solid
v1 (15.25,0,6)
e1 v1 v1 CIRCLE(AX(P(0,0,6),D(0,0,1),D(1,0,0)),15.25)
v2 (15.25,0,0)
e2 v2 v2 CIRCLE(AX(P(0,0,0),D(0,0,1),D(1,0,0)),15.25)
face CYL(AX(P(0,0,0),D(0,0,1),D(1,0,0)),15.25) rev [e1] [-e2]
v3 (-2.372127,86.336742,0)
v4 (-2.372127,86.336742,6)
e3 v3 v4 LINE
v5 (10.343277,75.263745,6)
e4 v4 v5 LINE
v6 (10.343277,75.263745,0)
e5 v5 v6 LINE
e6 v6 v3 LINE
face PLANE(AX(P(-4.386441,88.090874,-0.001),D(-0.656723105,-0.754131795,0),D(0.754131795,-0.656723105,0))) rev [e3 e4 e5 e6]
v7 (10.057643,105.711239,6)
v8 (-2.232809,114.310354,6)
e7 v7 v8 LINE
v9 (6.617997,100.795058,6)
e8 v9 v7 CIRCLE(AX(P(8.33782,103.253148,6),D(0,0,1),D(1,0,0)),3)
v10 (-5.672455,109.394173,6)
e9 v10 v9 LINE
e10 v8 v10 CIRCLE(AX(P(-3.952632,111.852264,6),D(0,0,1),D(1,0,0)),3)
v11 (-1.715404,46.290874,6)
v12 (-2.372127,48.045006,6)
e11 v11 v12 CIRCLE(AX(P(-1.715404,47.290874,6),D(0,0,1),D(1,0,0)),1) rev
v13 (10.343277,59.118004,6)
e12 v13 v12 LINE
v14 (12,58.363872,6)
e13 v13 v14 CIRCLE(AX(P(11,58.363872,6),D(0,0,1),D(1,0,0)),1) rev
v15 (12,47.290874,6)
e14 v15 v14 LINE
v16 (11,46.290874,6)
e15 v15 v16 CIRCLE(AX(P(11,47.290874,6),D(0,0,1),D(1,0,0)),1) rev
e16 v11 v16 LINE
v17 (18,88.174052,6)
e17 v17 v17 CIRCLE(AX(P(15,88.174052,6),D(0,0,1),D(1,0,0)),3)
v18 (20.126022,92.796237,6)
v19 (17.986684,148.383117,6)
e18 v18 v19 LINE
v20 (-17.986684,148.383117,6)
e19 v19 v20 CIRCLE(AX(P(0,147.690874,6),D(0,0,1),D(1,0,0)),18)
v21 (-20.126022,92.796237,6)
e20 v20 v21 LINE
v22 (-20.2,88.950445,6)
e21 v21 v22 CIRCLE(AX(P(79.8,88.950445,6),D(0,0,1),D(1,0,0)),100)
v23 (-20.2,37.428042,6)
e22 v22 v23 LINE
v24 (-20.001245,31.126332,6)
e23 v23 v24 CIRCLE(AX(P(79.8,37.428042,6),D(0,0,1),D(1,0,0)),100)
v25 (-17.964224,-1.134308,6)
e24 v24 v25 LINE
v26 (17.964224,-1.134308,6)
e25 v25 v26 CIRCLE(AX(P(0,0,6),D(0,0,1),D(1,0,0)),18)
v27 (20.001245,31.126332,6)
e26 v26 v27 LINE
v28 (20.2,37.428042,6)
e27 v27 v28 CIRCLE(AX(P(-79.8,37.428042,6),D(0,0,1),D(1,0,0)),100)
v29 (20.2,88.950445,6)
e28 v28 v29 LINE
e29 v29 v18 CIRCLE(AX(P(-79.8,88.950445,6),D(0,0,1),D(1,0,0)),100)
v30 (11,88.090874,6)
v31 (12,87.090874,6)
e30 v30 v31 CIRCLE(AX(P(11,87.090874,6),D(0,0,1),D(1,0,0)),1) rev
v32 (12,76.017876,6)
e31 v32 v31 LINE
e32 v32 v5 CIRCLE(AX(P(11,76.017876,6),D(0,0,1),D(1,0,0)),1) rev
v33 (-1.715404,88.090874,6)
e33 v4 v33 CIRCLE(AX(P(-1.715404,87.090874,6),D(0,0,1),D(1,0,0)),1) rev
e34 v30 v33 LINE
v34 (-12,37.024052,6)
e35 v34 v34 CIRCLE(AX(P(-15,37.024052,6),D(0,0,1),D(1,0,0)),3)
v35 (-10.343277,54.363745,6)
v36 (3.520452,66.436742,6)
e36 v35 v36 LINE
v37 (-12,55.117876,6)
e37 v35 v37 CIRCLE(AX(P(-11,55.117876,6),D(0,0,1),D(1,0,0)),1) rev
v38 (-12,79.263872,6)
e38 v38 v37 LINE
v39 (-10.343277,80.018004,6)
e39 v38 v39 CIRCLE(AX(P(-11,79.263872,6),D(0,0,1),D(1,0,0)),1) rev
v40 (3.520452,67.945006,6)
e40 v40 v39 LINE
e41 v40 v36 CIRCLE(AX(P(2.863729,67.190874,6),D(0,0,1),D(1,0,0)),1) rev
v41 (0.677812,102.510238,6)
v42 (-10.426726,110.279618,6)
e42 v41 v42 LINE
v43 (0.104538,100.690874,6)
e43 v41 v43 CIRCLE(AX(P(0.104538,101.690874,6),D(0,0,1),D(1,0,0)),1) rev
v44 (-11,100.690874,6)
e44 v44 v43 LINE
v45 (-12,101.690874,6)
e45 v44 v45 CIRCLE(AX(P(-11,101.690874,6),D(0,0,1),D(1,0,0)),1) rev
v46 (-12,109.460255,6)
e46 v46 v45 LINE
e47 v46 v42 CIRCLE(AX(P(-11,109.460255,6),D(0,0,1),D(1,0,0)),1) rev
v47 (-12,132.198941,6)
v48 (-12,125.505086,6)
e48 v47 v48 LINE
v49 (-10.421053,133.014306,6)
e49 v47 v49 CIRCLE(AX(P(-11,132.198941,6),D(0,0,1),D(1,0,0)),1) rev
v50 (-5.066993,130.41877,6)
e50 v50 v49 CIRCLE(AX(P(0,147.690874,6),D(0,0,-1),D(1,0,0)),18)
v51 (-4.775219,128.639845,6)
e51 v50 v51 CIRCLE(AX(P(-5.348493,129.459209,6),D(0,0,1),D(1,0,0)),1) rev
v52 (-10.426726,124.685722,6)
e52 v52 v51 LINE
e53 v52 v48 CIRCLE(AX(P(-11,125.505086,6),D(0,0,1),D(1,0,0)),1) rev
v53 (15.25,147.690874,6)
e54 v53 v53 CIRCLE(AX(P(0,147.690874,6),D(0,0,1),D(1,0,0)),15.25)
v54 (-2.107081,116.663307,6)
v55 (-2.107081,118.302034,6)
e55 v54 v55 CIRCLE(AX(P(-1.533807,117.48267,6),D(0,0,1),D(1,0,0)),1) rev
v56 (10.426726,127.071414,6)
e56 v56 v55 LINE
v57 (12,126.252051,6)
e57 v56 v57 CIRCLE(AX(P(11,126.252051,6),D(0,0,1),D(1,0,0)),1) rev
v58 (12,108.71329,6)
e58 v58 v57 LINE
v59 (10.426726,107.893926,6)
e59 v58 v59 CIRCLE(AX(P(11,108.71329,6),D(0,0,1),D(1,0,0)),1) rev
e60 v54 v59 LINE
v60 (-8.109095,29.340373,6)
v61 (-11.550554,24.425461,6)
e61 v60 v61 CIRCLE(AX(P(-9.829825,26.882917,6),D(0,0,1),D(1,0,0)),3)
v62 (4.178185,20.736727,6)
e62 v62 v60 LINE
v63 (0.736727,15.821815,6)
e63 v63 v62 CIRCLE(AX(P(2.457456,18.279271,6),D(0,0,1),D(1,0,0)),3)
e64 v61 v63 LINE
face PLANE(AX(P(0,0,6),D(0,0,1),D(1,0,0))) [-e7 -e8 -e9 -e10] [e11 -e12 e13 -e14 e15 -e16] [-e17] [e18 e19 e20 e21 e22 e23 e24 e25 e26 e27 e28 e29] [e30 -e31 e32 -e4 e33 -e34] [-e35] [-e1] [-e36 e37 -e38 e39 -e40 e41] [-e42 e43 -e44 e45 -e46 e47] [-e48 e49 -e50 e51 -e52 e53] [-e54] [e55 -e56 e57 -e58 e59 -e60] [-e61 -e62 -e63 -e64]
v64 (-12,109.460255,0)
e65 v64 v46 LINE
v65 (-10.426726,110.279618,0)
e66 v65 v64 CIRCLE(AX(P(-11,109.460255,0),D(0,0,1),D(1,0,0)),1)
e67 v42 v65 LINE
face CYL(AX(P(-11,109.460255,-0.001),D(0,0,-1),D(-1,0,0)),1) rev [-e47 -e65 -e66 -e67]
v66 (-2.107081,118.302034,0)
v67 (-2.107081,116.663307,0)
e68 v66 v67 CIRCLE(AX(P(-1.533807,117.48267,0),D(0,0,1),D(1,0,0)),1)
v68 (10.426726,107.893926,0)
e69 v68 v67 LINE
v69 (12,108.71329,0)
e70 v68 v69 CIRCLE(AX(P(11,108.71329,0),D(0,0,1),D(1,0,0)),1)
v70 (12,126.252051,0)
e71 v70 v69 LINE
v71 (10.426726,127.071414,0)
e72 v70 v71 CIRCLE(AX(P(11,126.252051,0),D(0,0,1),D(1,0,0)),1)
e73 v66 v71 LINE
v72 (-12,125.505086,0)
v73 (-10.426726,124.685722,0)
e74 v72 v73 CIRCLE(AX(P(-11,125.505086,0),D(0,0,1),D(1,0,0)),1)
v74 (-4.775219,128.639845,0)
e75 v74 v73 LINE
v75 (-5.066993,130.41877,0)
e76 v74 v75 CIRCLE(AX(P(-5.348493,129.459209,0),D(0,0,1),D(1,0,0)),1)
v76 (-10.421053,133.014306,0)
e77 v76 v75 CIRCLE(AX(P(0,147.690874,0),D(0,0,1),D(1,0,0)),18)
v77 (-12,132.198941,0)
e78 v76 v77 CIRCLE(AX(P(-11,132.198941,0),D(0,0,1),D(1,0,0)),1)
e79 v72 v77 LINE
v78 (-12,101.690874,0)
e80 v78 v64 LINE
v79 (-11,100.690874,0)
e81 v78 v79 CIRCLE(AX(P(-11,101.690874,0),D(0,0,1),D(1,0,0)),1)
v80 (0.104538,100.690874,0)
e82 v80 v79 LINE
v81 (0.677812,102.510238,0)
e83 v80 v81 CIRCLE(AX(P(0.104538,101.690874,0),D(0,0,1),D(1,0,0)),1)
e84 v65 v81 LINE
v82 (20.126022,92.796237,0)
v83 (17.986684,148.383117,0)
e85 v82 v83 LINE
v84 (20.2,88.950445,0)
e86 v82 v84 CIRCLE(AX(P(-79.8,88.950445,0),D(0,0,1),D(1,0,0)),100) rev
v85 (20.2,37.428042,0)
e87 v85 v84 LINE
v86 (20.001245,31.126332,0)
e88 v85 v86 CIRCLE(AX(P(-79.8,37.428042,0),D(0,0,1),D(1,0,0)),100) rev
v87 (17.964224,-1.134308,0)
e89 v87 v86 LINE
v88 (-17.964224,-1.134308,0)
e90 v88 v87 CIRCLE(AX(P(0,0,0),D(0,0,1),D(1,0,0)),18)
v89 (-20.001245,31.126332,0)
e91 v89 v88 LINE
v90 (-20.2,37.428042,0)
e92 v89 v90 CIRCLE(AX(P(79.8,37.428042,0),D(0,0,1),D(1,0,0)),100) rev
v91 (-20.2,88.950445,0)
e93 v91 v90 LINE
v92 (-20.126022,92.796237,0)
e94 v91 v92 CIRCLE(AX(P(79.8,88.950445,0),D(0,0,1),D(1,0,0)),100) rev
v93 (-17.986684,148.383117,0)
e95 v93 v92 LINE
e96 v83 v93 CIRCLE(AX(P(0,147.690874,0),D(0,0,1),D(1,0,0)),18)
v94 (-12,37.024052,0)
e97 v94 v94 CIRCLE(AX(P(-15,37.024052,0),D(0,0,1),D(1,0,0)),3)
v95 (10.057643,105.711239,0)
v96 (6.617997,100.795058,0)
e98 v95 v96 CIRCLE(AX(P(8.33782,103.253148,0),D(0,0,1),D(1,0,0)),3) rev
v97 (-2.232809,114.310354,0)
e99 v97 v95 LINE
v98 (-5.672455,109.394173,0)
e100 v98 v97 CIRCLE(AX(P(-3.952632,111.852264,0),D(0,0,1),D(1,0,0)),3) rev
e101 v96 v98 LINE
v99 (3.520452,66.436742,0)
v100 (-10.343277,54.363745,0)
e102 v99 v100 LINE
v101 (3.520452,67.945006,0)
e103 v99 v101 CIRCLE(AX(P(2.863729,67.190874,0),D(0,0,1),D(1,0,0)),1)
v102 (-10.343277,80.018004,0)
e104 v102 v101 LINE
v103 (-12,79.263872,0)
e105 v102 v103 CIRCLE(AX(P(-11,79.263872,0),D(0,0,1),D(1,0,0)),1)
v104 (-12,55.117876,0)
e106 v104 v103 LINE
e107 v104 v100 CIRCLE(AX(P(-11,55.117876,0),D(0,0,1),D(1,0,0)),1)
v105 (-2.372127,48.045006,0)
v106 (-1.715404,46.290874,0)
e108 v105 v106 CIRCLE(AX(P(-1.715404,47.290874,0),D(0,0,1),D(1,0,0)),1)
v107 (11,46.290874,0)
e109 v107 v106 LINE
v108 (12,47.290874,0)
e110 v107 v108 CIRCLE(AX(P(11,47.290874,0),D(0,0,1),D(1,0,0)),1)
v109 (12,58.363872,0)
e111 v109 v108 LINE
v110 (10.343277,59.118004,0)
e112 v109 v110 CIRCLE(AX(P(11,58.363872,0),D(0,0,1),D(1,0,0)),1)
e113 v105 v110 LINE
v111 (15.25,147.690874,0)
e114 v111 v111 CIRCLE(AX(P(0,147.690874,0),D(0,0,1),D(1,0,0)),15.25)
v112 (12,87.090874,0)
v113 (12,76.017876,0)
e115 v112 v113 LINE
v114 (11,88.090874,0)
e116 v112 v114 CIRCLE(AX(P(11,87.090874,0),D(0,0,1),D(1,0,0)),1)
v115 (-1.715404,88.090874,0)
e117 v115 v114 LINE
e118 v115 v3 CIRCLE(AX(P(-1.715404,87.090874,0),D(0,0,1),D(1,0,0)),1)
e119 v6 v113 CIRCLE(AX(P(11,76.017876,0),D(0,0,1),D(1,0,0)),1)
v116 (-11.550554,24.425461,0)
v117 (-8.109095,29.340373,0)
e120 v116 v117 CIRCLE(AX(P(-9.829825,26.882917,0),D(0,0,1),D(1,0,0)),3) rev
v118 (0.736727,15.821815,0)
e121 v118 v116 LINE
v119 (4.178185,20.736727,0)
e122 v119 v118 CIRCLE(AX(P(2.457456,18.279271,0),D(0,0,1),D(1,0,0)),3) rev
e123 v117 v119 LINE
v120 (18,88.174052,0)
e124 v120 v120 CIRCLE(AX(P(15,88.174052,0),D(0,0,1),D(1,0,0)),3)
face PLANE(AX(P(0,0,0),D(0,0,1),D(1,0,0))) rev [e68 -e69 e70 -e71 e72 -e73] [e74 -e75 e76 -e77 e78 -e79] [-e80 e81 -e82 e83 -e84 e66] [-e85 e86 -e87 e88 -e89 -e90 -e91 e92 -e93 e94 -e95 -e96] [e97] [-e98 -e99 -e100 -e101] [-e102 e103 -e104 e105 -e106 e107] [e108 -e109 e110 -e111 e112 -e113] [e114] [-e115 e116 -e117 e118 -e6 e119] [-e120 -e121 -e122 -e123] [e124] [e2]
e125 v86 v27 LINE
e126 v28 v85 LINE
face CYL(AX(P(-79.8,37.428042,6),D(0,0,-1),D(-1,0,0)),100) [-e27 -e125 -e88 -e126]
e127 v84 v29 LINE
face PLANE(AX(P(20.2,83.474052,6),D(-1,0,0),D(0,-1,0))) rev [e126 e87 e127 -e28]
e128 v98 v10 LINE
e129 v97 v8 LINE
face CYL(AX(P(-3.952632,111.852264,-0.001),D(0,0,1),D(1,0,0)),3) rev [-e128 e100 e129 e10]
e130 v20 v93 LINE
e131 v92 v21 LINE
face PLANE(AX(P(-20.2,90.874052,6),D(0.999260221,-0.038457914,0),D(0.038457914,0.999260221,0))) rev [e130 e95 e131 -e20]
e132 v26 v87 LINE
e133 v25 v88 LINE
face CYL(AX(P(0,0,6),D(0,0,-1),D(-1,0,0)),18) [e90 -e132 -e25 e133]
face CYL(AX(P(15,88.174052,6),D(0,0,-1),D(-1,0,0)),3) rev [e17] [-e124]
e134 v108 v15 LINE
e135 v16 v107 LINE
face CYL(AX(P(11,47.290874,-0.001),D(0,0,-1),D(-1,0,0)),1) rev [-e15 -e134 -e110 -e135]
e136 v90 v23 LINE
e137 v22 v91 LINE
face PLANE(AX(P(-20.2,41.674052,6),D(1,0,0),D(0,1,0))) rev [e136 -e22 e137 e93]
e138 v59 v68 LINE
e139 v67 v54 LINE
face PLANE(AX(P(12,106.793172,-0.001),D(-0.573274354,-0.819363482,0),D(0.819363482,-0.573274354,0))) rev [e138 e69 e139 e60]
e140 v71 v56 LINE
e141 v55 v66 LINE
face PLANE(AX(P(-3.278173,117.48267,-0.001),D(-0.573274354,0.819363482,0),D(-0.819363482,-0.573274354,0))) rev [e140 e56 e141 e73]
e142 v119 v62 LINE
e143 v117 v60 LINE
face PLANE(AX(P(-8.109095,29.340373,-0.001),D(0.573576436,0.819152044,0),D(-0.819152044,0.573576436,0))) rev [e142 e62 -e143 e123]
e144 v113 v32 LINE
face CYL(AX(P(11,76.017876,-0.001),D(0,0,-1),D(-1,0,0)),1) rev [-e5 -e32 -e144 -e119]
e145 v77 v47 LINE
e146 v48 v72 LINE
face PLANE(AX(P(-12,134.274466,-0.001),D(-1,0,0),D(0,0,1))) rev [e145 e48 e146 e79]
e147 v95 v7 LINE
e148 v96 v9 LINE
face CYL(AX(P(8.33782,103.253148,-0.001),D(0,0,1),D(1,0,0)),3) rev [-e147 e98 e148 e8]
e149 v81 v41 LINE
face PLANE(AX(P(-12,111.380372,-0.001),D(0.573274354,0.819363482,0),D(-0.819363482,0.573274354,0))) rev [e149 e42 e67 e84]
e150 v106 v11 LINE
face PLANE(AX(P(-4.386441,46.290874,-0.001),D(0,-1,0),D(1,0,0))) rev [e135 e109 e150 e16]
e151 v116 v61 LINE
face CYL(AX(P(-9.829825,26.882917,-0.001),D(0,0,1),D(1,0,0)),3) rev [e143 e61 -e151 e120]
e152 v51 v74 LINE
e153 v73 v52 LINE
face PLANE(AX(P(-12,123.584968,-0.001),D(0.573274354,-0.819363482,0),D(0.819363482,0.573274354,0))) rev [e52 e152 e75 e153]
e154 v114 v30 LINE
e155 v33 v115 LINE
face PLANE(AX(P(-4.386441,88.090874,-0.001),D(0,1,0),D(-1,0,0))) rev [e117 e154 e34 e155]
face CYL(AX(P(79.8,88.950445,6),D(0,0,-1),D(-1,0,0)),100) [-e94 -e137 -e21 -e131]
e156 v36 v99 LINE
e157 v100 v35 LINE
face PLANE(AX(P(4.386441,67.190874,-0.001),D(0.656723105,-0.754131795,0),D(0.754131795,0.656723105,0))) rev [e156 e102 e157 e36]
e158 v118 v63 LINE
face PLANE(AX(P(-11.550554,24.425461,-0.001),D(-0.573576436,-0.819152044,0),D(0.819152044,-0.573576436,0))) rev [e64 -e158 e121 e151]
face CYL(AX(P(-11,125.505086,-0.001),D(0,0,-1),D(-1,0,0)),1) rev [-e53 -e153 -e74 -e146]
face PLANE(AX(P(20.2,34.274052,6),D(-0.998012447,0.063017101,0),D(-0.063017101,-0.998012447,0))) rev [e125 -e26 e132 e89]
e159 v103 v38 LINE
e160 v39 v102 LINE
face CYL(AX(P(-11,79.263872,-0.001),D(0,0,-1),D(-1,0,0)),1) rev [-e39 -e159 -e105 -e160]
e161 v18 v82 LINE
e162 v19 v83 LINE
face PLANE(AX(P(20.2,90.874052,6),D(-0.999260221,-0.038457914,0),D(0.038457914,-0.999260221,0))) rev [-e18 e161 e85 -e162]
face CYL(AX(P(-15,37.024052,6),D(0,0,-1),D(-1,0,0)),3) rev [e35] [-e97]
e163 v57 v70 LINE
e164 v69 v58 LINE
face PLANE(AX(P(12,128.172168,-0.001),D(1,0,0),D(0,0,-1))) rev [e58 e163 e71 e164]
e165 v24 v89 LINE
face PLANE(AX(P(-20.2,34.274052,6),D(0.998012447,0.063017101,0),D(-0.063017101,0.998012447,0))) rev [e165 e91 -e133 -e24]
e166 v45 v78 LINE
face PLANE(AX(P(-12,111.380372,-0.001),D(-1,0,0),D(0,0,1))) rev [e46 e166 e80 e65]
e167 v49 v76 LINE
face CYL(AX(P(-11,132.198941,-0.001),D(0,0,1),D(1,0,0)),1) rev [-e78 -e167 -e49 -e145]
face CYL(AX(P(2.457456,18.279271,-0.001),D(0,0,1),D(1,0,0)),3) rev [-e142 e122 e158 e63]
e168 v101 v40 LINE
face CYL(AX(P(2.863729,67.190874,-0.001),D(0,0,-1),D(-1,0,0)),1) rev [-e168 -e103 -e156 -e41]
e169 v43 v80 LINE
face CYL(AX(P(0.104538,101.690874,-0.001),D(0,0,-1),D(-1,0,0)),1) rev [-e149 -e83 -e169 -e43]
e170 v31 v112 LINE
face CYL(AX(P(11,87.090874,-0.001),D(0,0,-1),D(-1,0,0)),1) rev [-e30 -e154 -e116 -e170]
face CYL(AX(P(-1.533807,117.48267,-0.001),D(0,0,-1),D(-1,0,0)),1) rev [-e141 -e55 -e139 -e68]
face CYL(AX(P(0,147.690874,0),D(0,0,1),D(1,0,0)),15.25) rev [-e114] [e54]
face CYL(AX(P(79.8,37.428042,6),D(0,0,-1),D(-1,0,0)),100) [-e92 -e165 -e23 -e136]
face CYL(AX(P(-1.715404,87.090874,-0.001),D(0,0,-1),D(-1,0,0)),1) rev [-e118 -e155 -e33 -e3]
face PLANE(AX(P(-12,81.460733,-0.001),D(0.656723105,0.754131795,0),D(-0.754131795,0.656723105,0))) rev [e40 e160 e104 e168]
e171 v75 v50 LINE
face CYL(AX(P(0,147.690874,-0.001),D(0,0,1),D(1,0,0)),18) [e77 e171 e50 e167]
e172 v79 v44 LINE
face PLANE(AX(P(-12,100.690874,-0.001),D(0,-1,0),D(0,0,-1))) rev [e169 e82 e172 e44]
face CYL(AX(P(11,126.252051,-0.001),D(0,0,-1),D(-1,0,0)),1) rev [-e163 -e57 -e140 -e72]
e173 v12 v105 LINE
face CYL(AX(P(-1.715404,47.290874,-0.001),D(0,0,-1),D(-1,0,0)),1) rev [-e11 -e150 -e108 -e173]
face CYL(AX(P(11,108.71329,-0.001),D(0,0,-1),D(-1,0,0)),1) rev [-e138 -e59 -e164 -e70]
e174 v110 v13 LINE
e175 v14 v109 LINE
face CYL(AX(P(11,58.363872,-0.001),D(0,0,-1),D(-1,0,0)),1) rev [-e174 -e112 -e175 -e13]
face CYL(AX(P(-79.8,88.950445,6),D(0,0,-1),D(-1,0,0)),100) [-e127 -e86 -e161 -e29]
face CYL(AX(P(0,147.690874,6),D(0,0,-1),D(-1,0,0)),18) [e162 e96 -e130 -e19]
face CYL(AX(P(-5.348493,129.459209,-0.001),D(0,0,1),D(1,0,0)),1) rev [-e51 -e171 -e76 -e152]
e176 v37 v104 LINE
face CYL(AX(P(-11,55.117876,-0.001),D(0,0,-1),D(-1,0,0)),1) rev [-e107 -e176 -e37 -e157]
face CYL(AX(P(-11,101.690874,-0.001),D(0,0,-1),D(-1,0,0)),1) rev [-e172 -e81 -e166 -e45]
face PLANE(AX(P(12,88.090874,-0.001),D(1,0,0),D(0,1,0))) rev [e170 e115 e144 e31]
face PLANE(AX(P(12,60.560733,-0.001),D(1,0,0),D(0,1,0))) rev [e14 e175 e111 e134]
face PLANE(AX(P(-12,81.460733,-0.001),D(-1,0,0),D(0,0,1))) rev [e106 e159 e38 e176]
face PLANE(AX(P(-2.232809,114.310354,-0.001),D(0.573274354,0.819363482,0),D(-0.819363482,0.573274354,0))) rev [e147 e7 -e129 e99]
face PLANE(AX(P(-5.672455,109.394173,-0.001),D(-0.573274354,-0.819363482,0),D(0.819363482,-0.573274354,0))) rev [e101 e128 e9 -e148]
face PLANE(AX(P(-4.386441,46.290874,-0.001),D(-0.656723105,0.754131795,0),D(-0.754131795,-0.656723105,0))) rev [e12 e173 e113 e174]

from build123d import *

# Parameters (mm, degrees)
SKETCH1_R               = 7.95
SKETCH1_R_2             = 3
MAIN_BODY_LINK_B1_DEPTH = 6
CUT_EXTRUDE2_REACH      = 169.025
CUT_EXTRUDE3_REACH      = 169.025
SKETCH5_R               = 1.5
PULLEYIDLERUP_DEPTH     = 6
CUT_EXTRUDE5_DEPTH      = 6
FILLET4_R               = 1
FILLET5_R               = 100
SKETCH8_R               = 15.25
CUT_EXTRUDE6_DEPTH      = 168.02546447


with BuildPart() as part:
    # Sketch1 → Main Body Link B1 (new body)
    with BuildSketch(Plane.XY):
        with BuildLine():
            Line((20.2, 41.674052381), (20.2, 83.474052381))
            Line((20.2, 83.474052381), (20.2, 90.874052381))
            Line((20.2, 90.874052381), (17.986683974, 148.383116621))
            ThreePointArc((17.986683974, 148.383116621), (0, 165.690874165), (-17.986683974, 148.383116621))
            Line((-17.986683974, 148.383116621), (-20.2, 90.874052381))
            Line((-20.2, 90.874052381), (-20.2, 83.474052381))
            Line((-20.2, 83.474052381), (-20.2, 41.674052381))
            Line((-20.2, 41.674052381), (-20.2, 34.274052381))
            Line((-20.2, 34.274052381), (-17.964224051, -1.134307826))
            ThreePointArc((-17.964224051, -1.134307826), (0, -18), (17.964224051, -1.134307826))
            Line((17.964224051, -1.134307826), (20.2, 34.274052381))
            Line((20.2, 34.274052381), (20.2, 41.674052381))
        make_face()
        Circle(SKETCH1_R, mode=Mode.SUBTRACT)
        with Locations((15, 88.174052381)):
            Circle(SKETCH1_R_2, mode=Mode.SUBTRACT)
        with Locations((-15, 37.024052381)):
            Circle(SKETCH1_R_2, mode=Mode.SUBTRACT)
        with Locations((0, 147.690874165)):
            Circle(SKETCH1_R, mode=Mode.SUBTRACT)
    extrude(amount=MAIN_BODY_LINK_B1_DEPTH)

    # Sketch4 → Cut-Extrude2 (cut, up to next)
    with BuildSketch(Plane.XY.offset(6), mode=Mode.PRIVATE) as cut_extrude2_sk1:
        with BuildLine():
            Line((-12, 134.2744663), (-12, 123.584968066))
            Line((-12, 123.584968066), (-2.929911079, 129.930929878))
            ThreePointArc((-2.929911079, 129.930929878), (-7.774454217, 131.456408925), (-12, 134.2744663))
        make_face()
    cut_extrude2_tool1 = extrude(cut_extrude2_sk1.sketch, amount=-CUT_EXTRUDE2_REACH, mode=Mode.PRIVATE) & part.part
    # Sketch4 → Cut-Extrude2 (cut, up to next)
    with BuildSketch(Plane.XY.offset(6), mode=Mode.PRIVATE) as cut_extrude2_sk2:
        Polygon((-12, 100.690874165), (3.278172542, 100.690874165), (-12, 111.380372399), align=None)
    cut_extrude2_tool2 = extrude(cut_extrude2_sk2.sketch, amount=-CUT_EXTRUDE2_REACH, mode=Mode.PRIVATE) & part.part
    # Sketch4 → Cut-Extrude2 (cut, up to next)
    with BuildSketch(Plane.XY.offset(6), mode=Mode.PRIVATE) as cut_extrude2_sk3:
        Polygon((12, 128.172168466), (12, 106.793171999), (-3.278172542, 117.482670232), align=None)
    cut_extrude2_tool3 = extrude(cut_extrude2_sk3.sketch, amount=-CUT_EXTRUDE2_REACH, mode=Mode.PRIVATE) & part.part
    # Sketch4 → Cut-Extrude2 (cut, up to next)
    with BuildSketch(Plane.XY.offset(6), mode=Mode.PRIVATE) as cut_extrude2_sk4:
        Polygon((-4.386441158, 88.090874165), (12, 88.090874165), (12, 73.82101499), align=None)
    cut_extrude2_tool4 = extrude(cut_extrude2_sk4.sketch, amount=-CUT_EXTRUDE2_REACH, mode=Mode.PRIVATE) & part.part
    # Sketch4 → Cut-Extrude2 (cut, up to next)
    with BuildSketch(Plane.XY.offset(6), mode=Mode.PRIVATE) as cut_extrude2_sk5:
        Polygon((-12, 81.46073334), (-12, 52.92101499), (4.386441158, 67.190874165), align=None)
    cut_extrude2_tool5 = extrude(cut_extrude2_sk5.sketch, amount=-CUT_EXTRUDE2_REACH, mode=Mode.PRIVATE) & part.part
    # Sketch4 → Cut-Extrude2 (cut, up to next)
    with BuildSketch(Plane.XY.offset(6), mode=Mode.PRIVATE) as cut_extrude2_sk6:
        Polygon((-4.386441158, 46.290874165), (12, 46.290874165), (12, 60.56073334), align=None)
    cut_extrude2_tool6 = extrude(cut_extrude2_sk6.sketch, amount=-CUT_EXTRUDE2_REACH, mode=Mode.PRIVATE) & part.part
    add(cut_extrude2_tool1.solids().sort_by_distance((-9.12997, 128.978342, 6))[0], mode=Mode.SUBTRACT)
    add(cut_extrude2_tool2.solids().sort_by_distance((-6.907276, 104.25404, 6))[0], mode=Mode.SUBTRACT)
    add(cut_extrude2_tool3.solids().sort_by_distance((6.907276, 117.48267, 6))[0], mode=Mode.SUBTRACT)
    add(cut_extrude2_tool4.solids().sort_by_distance((6.537853, 83.334254, 6))[0], mode=Mode.SUBTRACT)
    add(cut_extrude2_tool5.solids().sort_by_distance((-6.537853, 67.190874, 6))[0], mode=Mode.SUBTRACT)
    add(cut_extrude2_tool6.solids().sort_by_distance((6.537853, 51.047494, 6))[0], mode=Mode.SUBTRACT)

    # Sketch5 → Cut-Extrude3 (cut, up to next)
    with BuildSketch(Plane.XY.offset(6), mode=Mode.PRIVATE) as cut_extrude3_sk1:
        with Locations((11.5, 147.690874165)):
            Circle(SKETCH5_R)
    cut_extrude3_tool1 = extrude(cut_extrude3_sk1.sketch, amount=-CUT_EXTRUDE3_REACH, mode=Mode.PRIVATE) & part.part
    # Sketch5 → Cut-Extrude3 (cut, up to next)
    with BuildSketch(Plane.XY.offset(6), mode=Mode.PRIVATE) as cut_extrude3_sk2:
        with Locations((-11.5, 147.690874165)):
            Circle(SKETCH5_R)
    cut_extrude3_tool2 = extrude(cut_extrude3_sk2.sketch, amount=-CUT_EXTRUDE3_REACH, mode=Mode.PRIVATE) & part.part
    # Sketch5 → Cut-Extrude3 (cut, up to next)
    with BuildSketch(Plane.XY.offset(6), mode=Mode.PRIVATE) as cut_extrude3_sk3:
        with Locations((-11.5, 0)):
            Circle(SKETCH5_R)
    cut_extrude3_tool3 = extrude(cut_extrude3_sk3.sketch, amount=-CUT_EXTRUDE3_REACH, mode=Mode.PRIVATE) & part.part
    # Sketch5 → Cut-Extrude3 (cut, up to next)
    with BuildSketch(Plane.XY.offset(6), mode=Mode.PRIVATE) as cut_extrude3_sk4:
        with Locations((11.5, 0)):
            Circle(SKETCH5_R)
    cut_extrude3_tool4 = extrude(cut_extrude3_sk4.sketch, amount=-CUT_EXTRUDE3_REACH, mode=Mode.PRIVATE) & part.part
    add(cut_extrude3_tool1.solids().sort_by_distance((11.5, 147.690874, 6))[0], mode=Mode.SUBTRACT)
    add(cut_extrude3_tool2.solids().sort_by_distance((-11.5, 147.690874, 6))[0], mode=Mode.SUBTRACT)
    add(cut_extrude3_tool3.solids().sort_by_distance((-11.5, 0, 6))[0], mode=Mode.SUBTRACT)
    add(cut_extrude3_tool4.solids().sort_by_distance((11.5, 0, 6))[0], mode=Mode.SUBTRACT)

    # Sketch6 → PulleyIdlerUp (cut)
    with BuildSketch(Plane.XY.offset(6)):
        with BuildLine():
            Line((-5.672455467, 109.394173307), (6.61799676, 100.795058))
            ThreePointArc((6.61799676, 100.795058), (10.795910267, 101.533325384), (10.057642883, 105.71123889))
            Line((10.057642883, 105.71123889), (-2.232809344, 114.310354197))
            ThreePointArc((-2.232809344, 114.310354197), (-6.410722851, 113.572086814), (-5.672455467, 109.394173307))
        make_face()
    extrude(amount=-PULLEYIDLERUP_DEPTH, mode=Mode.SUBTRACT)

    # Sketch7 → Cut-Extrude5 (cut)
    with BuildSketch(Plane.XY.offset(6)):
        with BuildLine():
            Line((-11.550553841, 24.425461103), (0.736726824, 15.821814558))
            ThreePointArc((0.736726824, 15.821814558), (4.914912266, 16.558541382), (4.178185442, 20.736726824))
            Line((4.178185442, 20.736726824), (-8.109095222, 29.340373369))
            ThreePointArc((-8.109095222, 29.340373369), (-12.287280664, 28.603646545), (-11.550553841, 24.425461103))
        make_face()
    extrude(amount=-CUT_EXTRUDE5_DEPTH, mode=Mode.SUBTRACT)

    # Fillet4
    fillet4_edges = [part.edges().sort_by_distance(p)[0] for p in [
        (-12, 81.46073334, 3),
        (4.386441158, 67.190874165, 3),
        (-12, 52.92101499, 3),
        (-12, 134.2744663, 3),
        (-2.929911079, 129.930929878, 3),
        (-12, 123.584968066, 3),
        (-12, 100.690874165, 3),
        (-12, 111.380372399, 3),
        (3.278172542, 100.690874165, 3),
        (12, 106.793171999, 3),
        (-3.278172542, 117.482670232, 3),
        (12, 128.172168466, 3),
        (12, 60.56073334, 3),
        (12, 46.290874165, 3),
        (-4.386441158, 46.290874165, 3),
        (12, 88.090874165, 3),
        (12, 73.82101499, 3),
        (-4.386441158, 88.090874165, 3),
    ]]
    fillet(fillet4_edges, radius=FILLET4_R)

    # Fillet5
    # the kernel refuses this fillet: 100 mm, written as the material it takes off along each edge
    with BuildSketch(Plane(origin=(-20.2, 34.274052381, -7.884973578), x_dir=(0, 1, 0), z_dir=(0, 0, 1))) as fillet5_piece_1:
        with BuildLine():
            CenterArc((FILLET5_R * 0.0315398943126, -FILLET5_R), FILLET5_R, 90, 3.613007947)
            Line((-FILLET5_R * 0.0314772071099, -FILLET5_R * 0.00198755271875), (0, 0))
            Line((0, 0), (FILLET5_R * 0.0315398943126, 0))
        make_face()
    extrude(amount=21.769947156, mode=Mode.SUBTRACT)
    with BuildSketch(Plane(origin=(-20.2, 90.874052381, -4.809018086), x_dir=(0.03845791424359976, 0.9992602207793684, 0), z_dir=(0, 0, 1))) as fillet5_piece_2:
        with BuildLine():
            CenterArc((FILLET5_R * 0.0192360723451, -FILLET5_R), FILLET5_R, 90, 2.204019698)
            Line((-FILLET5_R * 0.0192218418985, -FILLET5_R * 0.000739779220632), (0, 0))
            Line((0, 0), (FILLET5_R * 0.0192360723451, 0))
        make_face()
    extrude(amount=15.618036173, mode=Mode.SUBTRACT)
    with BuildSketch(Plane(origin=(20.2, 90.874052381, -4.809018086), x_dir=(-0.03845791424359111, 0.9992602207793686, 0), z_dir=(0, 0, 1))) as fillet5_piece_3:
        with BuildLine():
            CenterArc((FILLET5_R * 0.0192360723451, FILLET5_R), FILLET5_R, 267.795980302, 2.204019698)
            Line((-FILLET5_R * 0.0192218418985, FILLET5_R * 0.000739779220631), (0, 0))
            Line((0, 0), (FILLET5_R * 0.0192360723451, 0))
        make_face()
    extrude(amount=15.618036173, mode=Mode.SUBTRACT)
    with BuildSketch(Plane(origin=(20.2, 34.274052381, -7.884973578), x_dir=(0, 1, 0), z_dir=(0, 0, 1))) as fillet5_piece_4:
        with BuildLine():
            CenterArc((FILLET5_R * 0.0315398943126, FILLET5_R), FILLET5_R, 266.386992053, 3.613007947)
            Line((-FILLET5_R * 0.0314772071099, FILLET5_R * 0.00198755271875), (0, 0))
            Line((0, 0), (FILLET5_R * 0.0315398943126, 0))
        make_face()
    extrude(amount=21.769947156, mode=Mode.SUBTRACT)

    # Sketch8 → Cut-Extrude6 (cut, through all)
    with BuildSketch(Plane.XY.offset(6)):
        Circle(SKETCH8_R)
        with Locations((0, 147.690874165)):
            Circle(SKETCH8_R)
    extrude(amount=-CUT_EXTRUDE6_DEPTH, mode=Mode.SUBTRACT)


solid = part.part
